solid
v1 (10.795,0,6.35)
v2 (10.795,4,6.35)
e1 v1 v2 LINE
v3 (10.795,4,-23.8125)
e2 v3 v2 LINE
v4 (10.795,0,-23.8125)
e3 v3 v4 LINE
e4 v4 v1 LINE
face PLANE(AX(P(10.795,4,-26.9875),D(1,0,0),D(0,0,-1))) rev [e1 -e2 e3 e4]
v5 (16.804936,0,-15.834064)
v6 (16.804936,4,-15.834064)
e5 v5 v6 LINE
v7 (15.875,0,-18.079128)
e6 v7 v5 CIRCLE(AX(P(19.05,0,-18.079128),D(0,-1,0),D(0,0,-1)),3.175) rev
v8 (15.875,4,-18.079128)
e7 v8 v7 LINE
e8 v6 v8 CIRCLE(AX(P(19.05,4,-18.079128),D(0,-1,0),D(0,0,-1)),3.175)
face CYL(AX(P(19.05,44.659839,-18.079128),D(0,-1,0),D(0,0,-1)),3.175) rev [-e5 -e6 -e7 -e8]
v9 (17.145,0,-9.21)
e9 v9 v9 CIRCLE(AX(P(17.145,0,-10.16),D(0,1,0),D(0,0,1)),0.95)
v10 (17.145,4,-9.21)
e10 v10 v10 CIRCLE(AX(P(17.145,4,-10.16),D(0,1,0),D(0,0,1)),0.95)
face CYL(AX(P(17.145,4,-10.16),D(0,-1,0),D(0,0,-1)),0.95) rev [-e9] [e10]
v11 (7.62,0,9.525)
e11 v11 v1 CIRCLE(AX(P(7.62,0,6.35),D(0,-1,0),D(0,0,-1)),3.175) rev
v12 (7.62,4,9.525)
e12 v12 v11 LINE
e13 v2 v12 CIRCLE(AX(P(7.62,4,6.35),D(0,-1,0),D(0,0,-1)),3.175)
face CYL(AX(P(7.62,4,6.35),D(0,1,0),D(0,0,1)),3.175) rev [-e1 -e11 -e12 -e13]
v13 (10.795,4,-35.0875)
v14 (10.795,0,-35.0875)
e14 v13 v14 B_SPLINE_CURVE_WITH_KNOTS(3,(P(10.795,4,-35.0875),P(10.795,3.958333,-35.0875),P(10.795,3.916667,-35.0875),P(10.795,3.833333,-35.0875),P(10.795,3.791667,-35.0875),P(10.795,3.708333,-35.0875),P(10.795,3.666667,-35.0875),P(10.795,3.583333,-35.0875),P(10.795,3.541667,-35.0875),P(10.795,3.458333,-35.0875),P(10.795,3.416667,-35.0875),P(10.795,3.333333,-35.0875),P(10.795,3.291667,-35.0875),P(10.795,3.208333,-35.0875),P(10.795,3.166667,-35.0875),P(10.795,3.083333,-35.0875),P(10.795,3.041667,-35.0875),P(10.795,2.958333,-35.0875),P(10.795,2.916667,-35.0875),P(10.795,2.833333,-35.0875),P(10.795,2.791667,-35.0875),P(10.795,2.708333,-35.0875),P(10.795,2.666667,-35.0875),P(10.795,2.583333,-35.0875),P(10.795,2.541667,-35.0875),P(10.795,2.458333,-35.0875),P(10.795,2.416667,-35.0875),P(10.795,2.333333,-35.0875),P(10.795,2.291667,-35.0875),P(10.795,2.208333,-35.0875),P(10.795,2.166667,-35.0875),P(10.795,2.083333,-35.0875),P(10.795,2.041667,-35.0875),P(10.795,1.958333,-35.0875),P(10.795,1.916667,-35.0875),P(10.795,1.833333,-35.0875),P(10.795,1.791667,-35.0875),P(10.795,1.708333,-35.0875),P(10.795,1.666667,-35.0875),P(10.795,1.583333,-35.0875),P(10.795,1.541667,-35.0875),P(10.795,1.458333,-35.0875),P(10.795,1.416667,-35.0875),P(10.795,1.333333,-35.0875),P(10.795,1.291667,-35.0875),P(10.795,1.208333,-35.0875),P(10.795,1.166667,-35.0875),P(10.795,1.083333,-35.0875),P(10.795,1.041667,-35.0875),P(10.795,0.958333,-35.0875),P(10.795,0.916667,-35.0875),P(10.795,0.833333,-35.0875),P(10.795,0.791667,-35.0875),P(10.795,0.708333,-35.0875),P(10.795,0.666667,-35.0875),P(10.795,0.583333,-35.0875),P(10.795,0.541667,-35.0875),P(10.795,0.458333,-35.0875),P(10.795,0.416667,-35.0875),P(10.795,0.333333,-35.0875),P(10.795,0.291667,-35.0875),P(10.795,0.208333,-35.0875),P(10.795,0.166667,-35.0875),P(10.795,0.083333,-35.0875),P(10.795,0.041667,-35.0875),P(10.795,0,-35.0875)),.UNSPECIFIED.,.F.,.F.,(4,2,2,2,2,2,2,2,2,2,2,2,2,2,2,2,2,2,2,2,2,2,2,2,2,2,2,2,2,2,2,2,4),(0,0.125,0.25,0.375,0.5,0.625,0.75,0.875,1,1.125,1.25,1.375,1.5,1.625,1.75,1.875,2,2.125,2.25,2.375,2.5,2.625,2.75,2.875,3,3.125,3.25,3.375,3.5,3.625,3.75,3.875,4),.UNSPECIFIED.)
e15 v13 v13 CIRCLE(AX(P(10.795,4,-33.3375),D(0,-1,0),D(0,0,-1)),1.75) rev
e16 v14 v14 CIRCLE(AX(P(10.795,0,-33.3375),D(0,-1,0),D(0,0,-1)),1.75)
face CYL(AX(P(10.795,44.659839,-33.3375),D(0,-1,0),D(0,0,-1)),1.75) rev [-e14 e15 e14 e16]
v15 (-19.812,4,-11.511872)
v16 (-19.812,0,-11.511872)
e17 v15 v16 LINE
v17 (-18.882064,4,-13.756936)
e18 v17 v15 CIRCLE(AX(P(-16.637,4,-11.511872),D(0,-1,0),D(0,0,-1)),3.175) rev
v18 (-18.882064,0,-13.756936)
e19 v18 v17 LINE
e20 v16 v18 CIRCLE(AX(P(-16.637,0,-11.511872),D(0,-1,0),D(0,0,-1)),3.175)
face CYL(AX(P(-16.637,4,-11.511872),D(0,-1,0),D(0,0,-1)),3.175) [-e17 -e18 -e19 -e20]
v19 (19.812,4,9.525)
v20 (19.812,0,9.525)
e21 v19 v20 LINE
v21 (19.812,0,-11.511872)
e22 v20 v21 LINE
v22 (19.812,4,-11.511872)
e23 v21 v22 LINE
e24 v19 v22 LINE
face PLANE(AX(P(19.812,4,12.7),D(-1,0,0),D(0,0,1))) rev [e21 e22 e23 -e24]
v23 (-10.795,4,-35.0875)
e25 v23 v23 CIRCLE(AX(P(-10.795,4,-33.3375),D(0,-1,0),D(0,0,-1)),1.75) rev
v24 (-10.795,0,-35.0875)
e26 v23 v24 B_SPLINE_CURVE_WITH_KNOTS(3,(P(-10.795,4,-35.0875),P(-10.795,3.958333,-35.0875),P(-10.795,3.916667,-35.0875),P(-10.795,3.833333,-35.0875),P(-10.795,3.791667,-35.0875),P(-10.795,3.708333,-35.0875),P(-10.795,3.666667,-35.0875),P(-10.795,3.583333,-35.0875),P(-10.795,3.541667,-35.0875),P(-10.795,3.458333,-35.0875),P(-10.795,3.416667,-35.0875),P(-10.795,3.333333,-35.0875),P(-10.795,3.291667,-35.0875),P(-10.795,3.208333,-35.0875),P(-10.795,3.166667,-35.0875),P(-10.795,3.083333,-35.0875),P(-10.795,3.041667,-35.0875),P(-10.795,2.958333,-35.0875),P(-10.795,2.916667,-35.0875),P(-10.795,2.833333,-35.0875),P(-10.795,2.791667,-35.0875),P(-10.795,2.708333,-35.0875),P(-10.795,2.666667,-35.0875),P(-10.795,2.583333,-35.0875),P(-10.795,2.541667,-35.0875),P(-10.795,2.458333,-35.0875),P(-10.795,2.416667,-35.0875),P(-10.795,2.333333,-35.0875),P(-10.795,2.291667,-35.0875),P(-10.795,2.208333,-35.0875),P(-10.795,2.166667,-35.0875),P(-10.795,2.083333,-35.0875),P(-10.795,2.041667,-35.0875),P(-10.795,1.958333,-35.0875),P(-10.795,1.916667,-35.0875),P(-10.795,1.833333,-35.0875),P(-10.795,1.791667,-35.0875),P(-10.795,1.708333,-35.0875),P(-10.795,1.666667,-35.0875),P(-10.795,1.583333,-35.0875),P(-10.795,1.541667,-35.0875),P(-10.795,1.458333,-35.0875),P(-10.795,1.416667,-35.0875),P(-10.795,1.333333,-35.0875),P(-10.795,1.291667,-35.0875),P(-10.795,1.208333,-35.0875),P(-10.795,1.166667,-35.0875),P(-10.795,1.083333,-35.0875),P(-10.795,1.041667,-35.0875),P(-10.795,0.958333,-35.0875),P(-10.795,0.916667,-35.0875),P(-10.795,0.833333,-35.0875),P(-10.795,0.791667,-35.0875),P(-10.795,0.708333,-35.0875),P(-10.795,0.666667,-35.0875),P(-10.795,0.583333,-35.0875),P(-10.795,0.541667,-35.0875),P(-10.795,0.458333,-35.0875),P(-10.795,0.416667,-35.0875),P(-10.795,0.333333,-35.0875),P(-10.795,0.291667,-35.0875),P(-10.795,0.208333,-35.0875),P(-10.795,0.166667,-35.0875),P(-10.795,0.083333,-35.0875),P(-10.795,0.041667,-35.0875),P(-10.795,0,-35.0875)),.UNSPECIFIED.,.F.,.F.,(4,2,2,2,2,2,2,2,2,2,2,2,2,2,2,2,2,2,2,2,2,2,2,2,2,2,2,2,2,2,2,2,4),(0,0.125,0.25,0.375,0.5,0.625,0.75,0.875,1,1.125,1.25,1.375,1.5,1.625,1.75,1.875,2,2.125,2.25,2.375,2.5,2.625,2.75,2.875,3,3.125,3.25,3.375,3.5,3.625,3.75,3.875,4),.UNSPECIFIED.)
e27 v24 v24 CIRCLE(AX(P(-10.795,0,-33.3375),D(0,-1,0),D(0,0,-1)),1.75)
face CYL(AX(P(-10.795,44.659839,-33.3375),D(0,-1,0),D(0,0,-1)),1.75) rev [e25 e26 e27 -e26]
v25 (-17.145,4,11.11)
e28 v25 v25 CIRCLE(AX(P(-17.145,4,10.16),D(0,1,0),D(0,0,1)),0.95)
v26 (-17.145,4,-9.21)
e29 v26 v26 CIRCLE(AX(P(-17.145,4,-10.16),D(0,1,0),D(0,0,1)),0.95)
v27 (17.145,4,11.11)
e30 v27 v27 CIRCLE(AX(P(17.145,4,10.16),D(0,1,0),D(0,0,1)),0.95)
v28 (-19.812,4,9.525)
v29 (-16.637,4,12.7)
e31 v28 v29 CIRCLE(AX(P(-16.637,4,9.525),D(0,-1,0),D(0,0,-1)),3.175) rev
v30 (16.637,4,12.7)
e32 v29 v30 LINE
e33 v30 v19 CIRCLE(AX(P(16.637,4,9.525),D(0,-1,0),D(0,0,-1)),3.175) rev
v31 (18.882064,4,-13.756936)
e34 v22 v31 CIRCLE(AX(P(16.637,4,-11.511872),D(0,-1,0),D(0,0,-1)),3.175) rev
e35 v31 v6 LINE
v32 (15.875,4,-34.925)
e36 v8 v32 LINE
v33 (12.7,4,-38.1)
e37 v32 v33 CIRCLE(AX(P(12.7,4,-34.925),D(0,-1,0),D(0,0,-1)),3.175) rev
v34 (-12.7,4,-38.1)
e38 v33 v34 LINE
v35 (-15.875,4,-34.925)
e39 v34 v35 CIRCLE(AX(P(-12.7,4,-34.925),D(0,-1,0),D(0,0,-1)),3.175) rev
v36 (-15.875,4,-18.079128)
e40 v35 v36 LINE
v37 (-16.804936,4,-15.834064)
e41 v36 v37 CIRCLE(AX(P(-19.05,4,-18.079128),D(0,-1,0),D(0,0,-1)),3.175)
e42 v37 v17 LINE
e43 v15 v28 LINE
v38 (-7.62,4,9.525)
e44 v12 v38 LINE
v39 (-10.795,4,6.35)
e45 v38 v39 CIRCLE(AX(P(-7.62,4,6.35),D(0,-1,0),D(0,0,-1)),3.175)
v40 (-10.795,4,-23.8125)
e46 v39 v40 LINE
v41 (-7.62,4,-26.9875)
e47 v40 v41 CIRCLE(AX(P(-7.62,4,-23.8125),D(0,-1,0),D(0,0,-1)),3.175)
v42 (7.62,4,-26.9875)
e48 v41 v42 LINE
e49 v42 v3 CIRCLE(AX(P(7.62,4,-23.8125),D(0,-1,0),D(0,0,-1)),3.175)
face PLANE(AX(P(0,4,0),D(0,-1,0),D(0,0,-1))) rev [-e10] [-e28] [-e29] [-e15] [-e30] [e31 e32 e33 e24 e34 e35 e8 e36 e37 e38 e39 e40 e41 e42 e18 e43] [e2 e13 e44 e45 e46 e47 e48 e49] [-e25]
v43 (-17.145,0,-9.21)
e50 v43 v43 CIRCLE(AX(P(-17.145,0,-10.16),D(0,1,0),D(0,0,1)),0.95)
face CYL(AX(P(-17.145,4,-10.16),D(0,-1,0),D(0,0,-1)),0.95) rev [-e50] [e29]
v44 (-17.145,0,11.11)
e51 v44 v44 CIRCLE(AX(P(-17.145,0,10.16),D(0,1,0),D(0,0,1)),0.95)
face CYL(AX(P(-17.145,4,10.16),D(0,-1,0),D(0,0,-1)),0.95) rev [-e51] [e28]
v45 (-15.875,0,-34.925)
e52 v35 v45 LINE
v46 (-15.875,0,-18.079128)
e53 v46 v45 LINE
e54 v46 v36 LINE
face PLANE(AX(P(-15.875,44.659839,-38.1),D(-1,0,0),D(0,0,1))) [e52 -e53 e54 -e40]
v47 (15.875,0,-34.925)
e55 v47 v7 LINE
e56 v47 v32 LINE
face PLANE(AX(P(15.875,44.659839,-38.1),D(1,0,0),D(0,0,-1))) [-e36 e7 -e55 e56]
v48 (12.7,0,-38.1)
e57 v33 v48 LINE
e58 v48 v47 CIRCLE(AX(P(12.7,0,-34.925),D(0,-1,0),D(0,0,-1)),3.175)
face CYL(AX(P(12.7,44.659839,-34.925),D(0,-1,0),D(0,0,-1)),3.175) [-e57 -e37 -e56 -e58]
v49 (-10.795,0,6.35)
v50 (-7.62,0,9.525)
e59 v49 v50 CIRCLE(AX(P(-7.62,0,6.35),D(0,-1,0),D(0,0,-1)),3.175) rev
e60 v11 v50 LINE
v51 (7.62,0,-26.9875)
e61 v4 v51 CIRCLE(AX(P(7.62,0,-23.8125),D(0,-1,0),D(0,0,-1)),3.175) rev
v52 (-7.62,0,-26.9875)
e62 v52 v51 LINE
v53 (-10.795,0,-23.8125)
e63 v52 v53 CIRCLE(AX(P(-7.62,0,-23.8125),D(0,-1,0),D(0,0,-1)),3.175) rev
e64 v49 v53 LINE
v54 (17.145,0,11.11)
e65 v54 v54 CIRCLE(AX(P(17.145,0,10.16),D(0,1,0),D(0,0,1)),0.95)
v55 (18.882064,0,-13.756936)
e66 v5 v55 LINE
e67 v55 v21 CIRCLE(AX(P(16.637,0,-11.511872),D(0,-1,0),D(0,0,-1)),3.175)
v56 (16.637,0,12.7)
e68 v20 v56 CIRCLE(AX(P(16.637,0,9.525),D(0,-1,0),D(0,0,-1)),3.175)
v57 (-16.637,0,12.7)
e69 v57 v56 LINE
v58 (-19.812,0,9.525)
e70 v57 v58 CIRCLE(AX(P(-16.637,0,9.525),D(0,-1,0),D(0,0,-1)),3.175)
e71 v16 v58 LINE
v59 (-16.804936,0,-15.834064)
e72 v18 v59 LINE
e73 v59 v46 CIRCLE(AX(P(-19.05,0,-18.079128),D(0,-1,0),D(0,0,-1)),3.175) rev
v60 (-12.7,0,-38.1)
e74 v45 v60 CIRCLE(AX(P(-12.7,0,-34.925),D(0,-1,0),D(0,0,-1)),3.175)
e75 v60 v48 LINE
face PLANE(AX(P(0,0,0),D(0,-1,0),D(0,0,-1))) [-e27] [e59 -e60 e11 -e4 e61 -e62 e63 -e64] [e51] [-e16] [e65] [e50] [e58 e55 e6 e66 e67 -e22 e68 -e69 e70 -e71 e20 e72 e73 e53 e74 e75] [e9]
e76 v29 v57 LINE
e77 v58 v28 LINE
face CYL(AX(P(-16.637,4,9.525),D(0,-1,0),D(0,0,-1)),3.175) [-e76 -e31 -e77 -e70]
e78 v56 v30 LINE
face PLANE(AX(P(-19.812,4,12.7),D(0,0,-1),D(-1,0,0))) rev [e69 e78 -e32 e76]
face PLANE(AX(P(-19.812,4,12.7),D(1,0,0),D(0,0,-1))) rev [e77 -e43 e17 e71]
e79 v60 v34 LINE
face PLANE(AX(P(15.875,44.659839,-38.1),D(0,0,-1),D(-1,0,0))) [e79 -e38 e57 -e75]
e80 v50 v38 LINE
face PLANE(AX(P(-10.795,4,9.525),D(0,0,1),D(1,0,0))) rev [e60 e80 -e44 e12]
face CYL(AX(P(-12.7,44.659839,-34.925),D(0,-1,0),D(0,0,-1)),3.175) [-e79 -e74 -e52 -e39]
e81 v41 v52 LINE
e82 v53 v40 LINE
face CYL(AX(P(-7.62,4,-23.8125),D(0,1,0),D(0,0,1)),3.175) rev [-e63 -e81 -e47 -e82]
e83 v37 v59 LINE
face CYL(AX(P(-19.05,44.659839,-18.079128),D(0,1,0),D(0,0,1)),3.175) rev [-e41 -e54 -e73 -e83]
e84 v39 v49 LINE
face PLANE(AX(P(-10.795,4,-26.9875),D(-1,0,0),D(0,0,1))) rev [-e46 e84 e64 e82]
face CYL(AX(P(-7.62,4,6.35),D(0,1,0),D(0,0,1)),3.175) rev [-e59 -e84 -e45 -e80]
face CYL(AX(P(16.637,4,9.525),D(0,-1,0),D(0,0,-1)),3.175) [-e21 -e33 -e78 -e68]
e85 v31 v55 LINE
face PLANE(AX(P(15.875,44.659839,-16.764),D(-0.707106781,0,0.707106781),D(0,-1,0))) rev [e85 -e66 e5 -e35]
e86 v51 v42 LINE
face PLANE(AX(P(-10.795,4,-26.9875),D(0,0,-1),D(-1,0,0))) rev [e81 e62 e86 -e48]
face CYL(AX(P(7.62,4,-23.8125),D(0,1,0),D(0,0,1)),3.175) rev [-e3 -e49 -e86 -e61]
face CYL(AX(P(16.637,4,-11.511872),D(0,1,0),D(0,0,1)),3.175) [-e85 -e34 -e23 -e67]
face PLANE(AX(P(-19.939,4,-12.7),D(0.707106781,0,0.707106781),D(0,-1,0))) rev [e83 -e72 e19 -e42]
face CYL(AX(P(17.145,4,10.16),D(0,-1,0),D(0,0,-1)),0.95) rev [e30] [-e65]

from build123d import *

# Parameters (mm, degrees)
SKETCH1_W           = 39.624
SKETCH1_H           = 25.4
SKETCH1_R           = 0.95
BOSS_EXTRUDE1_DEPTH = 4
SKETCH3_W           = 31.75
SKETCH3_H           = 25.4
SKETCH3_R           = 1.75
BOSS_EXTRUDE2_DEPTH = 4
SKETCH5_W           = 21.59
SKETCH5_H           = 36.5125
CUT_EXTRUDE2_DEPTH  = 44.129170453
CHAMFER1_SIZE       = 4.064
FILLET2_R           = 3.175


with BuildPart() as part:
    # Sketch1 → Boss-Extrude1 (new body)
    with BuildSketch(Plane(origin=(0, 0, 0), x_dir=(1, 0, 0), z_dir=(0, 1, 0))):
        Rectangle(SKETCH1_W, SKETCH1_H)
        with Locations(Location((-17.145, 10.16, 0), (0, 0, 270))):
            Circle(SKETCH1_R, mode=Mode.SUBTRACT)
        with Locations(Location((-17.145, -10.16, 0), (0, 0, 270))):
            Circle(SKETCH1_R, mode=Mode.SUBTRACT)
        with Locations(Location((17.145, -10.16, 0), (0, 0, 270))):
            Circle(SKETCH1_R, mode=Mode.SUBTRACT)
        with Locations(Location((17.145, 10.16, 0), (0, 0, 270))):
            Circle(SKETCH1_R, mode=Mode.SUBTRACT)
    extrude(amount=BOSS_EXTRUDE1_DEPTH)

    # Sketch3 → Boss-Extrude2 (add)
    with BuildSketch(Plane.XZ):
        with Locations((0, -25.4)):
            Rectangle(SKETCH3_W, SKETCH3_H)
        with Locations(Location((-10.795, -33.3375, 0), (0, 0, 270))):
            Circle(SKETCH3_R, mode=Mode.SUBTRACT)
        with Locations(Location((10.795, -33.3375, 0), (0, 0, 270))):
            Circle(SKETCH3_R, mode=Mode.SUBTRACT)
    extrude(amount=-BOSS_EXTRUDE2_DEPTH)

    # Sketch5 → Cut-Extrude2 (cut, through all)
    with BuildSketch(Plane.XZ):
        with Locations((0, -8.73125)):
            Rectangle(SKETCH5_W, SKETCH5_H)
    extrude(amount=-CUT_EXTRUDE2_DEPTH, mode=Mode.SUBTRACT)

    # Chamfer1
    # the kernel refuses this chamfer: 4.064 mm, written as the material it adds along each edge
    with BuildSketch(Plane(origin=(15.875, 0, -12.7), x_dir=(0.9996219169112968, 0, 0.027495876610586435), z_dir=(0, 1, 0))) as chamfer1_piece_1_section:
        Polygon((CHAMFER1_SIZE * 0.999621916911, CHAMFER1_SIZE * 0.0274958766106), (-CHAMFER1_SIZE * 0.0274958766106, CHAMFER1_SIZE * 0.999621916911), (0, 0), align=None)
    chamfer1_piece_1 = extrude(amount=4, mode=Mode.PRIVATE)
    chamfer1_piece_1 = split(chamfer1_piece_1, bisect_by=Plane(origin=(19.812, 2, -14.047586344), z_dir=(-1, 0, 0)), keep=Keep.TOP, mode=Mode.PRIVATE)
    add(chamfer1_piece_1)
    with BuildSketch(Plane(origin=(-15.875, 0, -12.7), x_dir=(-0.9996219169112968, 0, 0.027495876610586455), z_dir=(0, 1, 0))) as chamfer1_piece_2_section:
        Polygon((CHAMFER1_SIZE * 0.999621916911, -CHAMFER1_SIZE * 0.0274958766106), (-CHAMFER1_SIZE * 0.0274958766106, -CHAMFER1_SIZE * 0.999621916911), (0, 0), align=None)
    chamfer1_piece_2 = extrude(amount=4, mode=Mode.PRIVATE)
    chamfer1_piece_2 = split(chamfer1_piece_2, bisect_by=Plane(origin=(-19.812, 2, -14.047586344), z_dir=(1, 0, 0)), keep=Keep.TOP, mode=Mode.PRIVATE)
    add(chamfer1_piece_2)

    # Fillet2
    fillet2_edges = [part.edges().sort_by_distance(p)[0] for p in [
        (15.875, 2, -38.1),
        (-15.875, 2, -38.1),
        (10.795, 2, 9.525),
        (10.795, 2, -26.9875),
        (-10.795, 2, -26.9875),
        (-10.795, 2, 9.525),
        (15.875, 2, -16.764),
        (-15.875, 2, -16.764),
        (19.812, 2, -12.827),
        (-19.812, 2, -12.827),
        (19.812, 2, 12.7),
        (-19.812, 2, 12.7),
    ]]
    fillet(fillet2_edges, radius=FILLET2_R)


solid = part.part
